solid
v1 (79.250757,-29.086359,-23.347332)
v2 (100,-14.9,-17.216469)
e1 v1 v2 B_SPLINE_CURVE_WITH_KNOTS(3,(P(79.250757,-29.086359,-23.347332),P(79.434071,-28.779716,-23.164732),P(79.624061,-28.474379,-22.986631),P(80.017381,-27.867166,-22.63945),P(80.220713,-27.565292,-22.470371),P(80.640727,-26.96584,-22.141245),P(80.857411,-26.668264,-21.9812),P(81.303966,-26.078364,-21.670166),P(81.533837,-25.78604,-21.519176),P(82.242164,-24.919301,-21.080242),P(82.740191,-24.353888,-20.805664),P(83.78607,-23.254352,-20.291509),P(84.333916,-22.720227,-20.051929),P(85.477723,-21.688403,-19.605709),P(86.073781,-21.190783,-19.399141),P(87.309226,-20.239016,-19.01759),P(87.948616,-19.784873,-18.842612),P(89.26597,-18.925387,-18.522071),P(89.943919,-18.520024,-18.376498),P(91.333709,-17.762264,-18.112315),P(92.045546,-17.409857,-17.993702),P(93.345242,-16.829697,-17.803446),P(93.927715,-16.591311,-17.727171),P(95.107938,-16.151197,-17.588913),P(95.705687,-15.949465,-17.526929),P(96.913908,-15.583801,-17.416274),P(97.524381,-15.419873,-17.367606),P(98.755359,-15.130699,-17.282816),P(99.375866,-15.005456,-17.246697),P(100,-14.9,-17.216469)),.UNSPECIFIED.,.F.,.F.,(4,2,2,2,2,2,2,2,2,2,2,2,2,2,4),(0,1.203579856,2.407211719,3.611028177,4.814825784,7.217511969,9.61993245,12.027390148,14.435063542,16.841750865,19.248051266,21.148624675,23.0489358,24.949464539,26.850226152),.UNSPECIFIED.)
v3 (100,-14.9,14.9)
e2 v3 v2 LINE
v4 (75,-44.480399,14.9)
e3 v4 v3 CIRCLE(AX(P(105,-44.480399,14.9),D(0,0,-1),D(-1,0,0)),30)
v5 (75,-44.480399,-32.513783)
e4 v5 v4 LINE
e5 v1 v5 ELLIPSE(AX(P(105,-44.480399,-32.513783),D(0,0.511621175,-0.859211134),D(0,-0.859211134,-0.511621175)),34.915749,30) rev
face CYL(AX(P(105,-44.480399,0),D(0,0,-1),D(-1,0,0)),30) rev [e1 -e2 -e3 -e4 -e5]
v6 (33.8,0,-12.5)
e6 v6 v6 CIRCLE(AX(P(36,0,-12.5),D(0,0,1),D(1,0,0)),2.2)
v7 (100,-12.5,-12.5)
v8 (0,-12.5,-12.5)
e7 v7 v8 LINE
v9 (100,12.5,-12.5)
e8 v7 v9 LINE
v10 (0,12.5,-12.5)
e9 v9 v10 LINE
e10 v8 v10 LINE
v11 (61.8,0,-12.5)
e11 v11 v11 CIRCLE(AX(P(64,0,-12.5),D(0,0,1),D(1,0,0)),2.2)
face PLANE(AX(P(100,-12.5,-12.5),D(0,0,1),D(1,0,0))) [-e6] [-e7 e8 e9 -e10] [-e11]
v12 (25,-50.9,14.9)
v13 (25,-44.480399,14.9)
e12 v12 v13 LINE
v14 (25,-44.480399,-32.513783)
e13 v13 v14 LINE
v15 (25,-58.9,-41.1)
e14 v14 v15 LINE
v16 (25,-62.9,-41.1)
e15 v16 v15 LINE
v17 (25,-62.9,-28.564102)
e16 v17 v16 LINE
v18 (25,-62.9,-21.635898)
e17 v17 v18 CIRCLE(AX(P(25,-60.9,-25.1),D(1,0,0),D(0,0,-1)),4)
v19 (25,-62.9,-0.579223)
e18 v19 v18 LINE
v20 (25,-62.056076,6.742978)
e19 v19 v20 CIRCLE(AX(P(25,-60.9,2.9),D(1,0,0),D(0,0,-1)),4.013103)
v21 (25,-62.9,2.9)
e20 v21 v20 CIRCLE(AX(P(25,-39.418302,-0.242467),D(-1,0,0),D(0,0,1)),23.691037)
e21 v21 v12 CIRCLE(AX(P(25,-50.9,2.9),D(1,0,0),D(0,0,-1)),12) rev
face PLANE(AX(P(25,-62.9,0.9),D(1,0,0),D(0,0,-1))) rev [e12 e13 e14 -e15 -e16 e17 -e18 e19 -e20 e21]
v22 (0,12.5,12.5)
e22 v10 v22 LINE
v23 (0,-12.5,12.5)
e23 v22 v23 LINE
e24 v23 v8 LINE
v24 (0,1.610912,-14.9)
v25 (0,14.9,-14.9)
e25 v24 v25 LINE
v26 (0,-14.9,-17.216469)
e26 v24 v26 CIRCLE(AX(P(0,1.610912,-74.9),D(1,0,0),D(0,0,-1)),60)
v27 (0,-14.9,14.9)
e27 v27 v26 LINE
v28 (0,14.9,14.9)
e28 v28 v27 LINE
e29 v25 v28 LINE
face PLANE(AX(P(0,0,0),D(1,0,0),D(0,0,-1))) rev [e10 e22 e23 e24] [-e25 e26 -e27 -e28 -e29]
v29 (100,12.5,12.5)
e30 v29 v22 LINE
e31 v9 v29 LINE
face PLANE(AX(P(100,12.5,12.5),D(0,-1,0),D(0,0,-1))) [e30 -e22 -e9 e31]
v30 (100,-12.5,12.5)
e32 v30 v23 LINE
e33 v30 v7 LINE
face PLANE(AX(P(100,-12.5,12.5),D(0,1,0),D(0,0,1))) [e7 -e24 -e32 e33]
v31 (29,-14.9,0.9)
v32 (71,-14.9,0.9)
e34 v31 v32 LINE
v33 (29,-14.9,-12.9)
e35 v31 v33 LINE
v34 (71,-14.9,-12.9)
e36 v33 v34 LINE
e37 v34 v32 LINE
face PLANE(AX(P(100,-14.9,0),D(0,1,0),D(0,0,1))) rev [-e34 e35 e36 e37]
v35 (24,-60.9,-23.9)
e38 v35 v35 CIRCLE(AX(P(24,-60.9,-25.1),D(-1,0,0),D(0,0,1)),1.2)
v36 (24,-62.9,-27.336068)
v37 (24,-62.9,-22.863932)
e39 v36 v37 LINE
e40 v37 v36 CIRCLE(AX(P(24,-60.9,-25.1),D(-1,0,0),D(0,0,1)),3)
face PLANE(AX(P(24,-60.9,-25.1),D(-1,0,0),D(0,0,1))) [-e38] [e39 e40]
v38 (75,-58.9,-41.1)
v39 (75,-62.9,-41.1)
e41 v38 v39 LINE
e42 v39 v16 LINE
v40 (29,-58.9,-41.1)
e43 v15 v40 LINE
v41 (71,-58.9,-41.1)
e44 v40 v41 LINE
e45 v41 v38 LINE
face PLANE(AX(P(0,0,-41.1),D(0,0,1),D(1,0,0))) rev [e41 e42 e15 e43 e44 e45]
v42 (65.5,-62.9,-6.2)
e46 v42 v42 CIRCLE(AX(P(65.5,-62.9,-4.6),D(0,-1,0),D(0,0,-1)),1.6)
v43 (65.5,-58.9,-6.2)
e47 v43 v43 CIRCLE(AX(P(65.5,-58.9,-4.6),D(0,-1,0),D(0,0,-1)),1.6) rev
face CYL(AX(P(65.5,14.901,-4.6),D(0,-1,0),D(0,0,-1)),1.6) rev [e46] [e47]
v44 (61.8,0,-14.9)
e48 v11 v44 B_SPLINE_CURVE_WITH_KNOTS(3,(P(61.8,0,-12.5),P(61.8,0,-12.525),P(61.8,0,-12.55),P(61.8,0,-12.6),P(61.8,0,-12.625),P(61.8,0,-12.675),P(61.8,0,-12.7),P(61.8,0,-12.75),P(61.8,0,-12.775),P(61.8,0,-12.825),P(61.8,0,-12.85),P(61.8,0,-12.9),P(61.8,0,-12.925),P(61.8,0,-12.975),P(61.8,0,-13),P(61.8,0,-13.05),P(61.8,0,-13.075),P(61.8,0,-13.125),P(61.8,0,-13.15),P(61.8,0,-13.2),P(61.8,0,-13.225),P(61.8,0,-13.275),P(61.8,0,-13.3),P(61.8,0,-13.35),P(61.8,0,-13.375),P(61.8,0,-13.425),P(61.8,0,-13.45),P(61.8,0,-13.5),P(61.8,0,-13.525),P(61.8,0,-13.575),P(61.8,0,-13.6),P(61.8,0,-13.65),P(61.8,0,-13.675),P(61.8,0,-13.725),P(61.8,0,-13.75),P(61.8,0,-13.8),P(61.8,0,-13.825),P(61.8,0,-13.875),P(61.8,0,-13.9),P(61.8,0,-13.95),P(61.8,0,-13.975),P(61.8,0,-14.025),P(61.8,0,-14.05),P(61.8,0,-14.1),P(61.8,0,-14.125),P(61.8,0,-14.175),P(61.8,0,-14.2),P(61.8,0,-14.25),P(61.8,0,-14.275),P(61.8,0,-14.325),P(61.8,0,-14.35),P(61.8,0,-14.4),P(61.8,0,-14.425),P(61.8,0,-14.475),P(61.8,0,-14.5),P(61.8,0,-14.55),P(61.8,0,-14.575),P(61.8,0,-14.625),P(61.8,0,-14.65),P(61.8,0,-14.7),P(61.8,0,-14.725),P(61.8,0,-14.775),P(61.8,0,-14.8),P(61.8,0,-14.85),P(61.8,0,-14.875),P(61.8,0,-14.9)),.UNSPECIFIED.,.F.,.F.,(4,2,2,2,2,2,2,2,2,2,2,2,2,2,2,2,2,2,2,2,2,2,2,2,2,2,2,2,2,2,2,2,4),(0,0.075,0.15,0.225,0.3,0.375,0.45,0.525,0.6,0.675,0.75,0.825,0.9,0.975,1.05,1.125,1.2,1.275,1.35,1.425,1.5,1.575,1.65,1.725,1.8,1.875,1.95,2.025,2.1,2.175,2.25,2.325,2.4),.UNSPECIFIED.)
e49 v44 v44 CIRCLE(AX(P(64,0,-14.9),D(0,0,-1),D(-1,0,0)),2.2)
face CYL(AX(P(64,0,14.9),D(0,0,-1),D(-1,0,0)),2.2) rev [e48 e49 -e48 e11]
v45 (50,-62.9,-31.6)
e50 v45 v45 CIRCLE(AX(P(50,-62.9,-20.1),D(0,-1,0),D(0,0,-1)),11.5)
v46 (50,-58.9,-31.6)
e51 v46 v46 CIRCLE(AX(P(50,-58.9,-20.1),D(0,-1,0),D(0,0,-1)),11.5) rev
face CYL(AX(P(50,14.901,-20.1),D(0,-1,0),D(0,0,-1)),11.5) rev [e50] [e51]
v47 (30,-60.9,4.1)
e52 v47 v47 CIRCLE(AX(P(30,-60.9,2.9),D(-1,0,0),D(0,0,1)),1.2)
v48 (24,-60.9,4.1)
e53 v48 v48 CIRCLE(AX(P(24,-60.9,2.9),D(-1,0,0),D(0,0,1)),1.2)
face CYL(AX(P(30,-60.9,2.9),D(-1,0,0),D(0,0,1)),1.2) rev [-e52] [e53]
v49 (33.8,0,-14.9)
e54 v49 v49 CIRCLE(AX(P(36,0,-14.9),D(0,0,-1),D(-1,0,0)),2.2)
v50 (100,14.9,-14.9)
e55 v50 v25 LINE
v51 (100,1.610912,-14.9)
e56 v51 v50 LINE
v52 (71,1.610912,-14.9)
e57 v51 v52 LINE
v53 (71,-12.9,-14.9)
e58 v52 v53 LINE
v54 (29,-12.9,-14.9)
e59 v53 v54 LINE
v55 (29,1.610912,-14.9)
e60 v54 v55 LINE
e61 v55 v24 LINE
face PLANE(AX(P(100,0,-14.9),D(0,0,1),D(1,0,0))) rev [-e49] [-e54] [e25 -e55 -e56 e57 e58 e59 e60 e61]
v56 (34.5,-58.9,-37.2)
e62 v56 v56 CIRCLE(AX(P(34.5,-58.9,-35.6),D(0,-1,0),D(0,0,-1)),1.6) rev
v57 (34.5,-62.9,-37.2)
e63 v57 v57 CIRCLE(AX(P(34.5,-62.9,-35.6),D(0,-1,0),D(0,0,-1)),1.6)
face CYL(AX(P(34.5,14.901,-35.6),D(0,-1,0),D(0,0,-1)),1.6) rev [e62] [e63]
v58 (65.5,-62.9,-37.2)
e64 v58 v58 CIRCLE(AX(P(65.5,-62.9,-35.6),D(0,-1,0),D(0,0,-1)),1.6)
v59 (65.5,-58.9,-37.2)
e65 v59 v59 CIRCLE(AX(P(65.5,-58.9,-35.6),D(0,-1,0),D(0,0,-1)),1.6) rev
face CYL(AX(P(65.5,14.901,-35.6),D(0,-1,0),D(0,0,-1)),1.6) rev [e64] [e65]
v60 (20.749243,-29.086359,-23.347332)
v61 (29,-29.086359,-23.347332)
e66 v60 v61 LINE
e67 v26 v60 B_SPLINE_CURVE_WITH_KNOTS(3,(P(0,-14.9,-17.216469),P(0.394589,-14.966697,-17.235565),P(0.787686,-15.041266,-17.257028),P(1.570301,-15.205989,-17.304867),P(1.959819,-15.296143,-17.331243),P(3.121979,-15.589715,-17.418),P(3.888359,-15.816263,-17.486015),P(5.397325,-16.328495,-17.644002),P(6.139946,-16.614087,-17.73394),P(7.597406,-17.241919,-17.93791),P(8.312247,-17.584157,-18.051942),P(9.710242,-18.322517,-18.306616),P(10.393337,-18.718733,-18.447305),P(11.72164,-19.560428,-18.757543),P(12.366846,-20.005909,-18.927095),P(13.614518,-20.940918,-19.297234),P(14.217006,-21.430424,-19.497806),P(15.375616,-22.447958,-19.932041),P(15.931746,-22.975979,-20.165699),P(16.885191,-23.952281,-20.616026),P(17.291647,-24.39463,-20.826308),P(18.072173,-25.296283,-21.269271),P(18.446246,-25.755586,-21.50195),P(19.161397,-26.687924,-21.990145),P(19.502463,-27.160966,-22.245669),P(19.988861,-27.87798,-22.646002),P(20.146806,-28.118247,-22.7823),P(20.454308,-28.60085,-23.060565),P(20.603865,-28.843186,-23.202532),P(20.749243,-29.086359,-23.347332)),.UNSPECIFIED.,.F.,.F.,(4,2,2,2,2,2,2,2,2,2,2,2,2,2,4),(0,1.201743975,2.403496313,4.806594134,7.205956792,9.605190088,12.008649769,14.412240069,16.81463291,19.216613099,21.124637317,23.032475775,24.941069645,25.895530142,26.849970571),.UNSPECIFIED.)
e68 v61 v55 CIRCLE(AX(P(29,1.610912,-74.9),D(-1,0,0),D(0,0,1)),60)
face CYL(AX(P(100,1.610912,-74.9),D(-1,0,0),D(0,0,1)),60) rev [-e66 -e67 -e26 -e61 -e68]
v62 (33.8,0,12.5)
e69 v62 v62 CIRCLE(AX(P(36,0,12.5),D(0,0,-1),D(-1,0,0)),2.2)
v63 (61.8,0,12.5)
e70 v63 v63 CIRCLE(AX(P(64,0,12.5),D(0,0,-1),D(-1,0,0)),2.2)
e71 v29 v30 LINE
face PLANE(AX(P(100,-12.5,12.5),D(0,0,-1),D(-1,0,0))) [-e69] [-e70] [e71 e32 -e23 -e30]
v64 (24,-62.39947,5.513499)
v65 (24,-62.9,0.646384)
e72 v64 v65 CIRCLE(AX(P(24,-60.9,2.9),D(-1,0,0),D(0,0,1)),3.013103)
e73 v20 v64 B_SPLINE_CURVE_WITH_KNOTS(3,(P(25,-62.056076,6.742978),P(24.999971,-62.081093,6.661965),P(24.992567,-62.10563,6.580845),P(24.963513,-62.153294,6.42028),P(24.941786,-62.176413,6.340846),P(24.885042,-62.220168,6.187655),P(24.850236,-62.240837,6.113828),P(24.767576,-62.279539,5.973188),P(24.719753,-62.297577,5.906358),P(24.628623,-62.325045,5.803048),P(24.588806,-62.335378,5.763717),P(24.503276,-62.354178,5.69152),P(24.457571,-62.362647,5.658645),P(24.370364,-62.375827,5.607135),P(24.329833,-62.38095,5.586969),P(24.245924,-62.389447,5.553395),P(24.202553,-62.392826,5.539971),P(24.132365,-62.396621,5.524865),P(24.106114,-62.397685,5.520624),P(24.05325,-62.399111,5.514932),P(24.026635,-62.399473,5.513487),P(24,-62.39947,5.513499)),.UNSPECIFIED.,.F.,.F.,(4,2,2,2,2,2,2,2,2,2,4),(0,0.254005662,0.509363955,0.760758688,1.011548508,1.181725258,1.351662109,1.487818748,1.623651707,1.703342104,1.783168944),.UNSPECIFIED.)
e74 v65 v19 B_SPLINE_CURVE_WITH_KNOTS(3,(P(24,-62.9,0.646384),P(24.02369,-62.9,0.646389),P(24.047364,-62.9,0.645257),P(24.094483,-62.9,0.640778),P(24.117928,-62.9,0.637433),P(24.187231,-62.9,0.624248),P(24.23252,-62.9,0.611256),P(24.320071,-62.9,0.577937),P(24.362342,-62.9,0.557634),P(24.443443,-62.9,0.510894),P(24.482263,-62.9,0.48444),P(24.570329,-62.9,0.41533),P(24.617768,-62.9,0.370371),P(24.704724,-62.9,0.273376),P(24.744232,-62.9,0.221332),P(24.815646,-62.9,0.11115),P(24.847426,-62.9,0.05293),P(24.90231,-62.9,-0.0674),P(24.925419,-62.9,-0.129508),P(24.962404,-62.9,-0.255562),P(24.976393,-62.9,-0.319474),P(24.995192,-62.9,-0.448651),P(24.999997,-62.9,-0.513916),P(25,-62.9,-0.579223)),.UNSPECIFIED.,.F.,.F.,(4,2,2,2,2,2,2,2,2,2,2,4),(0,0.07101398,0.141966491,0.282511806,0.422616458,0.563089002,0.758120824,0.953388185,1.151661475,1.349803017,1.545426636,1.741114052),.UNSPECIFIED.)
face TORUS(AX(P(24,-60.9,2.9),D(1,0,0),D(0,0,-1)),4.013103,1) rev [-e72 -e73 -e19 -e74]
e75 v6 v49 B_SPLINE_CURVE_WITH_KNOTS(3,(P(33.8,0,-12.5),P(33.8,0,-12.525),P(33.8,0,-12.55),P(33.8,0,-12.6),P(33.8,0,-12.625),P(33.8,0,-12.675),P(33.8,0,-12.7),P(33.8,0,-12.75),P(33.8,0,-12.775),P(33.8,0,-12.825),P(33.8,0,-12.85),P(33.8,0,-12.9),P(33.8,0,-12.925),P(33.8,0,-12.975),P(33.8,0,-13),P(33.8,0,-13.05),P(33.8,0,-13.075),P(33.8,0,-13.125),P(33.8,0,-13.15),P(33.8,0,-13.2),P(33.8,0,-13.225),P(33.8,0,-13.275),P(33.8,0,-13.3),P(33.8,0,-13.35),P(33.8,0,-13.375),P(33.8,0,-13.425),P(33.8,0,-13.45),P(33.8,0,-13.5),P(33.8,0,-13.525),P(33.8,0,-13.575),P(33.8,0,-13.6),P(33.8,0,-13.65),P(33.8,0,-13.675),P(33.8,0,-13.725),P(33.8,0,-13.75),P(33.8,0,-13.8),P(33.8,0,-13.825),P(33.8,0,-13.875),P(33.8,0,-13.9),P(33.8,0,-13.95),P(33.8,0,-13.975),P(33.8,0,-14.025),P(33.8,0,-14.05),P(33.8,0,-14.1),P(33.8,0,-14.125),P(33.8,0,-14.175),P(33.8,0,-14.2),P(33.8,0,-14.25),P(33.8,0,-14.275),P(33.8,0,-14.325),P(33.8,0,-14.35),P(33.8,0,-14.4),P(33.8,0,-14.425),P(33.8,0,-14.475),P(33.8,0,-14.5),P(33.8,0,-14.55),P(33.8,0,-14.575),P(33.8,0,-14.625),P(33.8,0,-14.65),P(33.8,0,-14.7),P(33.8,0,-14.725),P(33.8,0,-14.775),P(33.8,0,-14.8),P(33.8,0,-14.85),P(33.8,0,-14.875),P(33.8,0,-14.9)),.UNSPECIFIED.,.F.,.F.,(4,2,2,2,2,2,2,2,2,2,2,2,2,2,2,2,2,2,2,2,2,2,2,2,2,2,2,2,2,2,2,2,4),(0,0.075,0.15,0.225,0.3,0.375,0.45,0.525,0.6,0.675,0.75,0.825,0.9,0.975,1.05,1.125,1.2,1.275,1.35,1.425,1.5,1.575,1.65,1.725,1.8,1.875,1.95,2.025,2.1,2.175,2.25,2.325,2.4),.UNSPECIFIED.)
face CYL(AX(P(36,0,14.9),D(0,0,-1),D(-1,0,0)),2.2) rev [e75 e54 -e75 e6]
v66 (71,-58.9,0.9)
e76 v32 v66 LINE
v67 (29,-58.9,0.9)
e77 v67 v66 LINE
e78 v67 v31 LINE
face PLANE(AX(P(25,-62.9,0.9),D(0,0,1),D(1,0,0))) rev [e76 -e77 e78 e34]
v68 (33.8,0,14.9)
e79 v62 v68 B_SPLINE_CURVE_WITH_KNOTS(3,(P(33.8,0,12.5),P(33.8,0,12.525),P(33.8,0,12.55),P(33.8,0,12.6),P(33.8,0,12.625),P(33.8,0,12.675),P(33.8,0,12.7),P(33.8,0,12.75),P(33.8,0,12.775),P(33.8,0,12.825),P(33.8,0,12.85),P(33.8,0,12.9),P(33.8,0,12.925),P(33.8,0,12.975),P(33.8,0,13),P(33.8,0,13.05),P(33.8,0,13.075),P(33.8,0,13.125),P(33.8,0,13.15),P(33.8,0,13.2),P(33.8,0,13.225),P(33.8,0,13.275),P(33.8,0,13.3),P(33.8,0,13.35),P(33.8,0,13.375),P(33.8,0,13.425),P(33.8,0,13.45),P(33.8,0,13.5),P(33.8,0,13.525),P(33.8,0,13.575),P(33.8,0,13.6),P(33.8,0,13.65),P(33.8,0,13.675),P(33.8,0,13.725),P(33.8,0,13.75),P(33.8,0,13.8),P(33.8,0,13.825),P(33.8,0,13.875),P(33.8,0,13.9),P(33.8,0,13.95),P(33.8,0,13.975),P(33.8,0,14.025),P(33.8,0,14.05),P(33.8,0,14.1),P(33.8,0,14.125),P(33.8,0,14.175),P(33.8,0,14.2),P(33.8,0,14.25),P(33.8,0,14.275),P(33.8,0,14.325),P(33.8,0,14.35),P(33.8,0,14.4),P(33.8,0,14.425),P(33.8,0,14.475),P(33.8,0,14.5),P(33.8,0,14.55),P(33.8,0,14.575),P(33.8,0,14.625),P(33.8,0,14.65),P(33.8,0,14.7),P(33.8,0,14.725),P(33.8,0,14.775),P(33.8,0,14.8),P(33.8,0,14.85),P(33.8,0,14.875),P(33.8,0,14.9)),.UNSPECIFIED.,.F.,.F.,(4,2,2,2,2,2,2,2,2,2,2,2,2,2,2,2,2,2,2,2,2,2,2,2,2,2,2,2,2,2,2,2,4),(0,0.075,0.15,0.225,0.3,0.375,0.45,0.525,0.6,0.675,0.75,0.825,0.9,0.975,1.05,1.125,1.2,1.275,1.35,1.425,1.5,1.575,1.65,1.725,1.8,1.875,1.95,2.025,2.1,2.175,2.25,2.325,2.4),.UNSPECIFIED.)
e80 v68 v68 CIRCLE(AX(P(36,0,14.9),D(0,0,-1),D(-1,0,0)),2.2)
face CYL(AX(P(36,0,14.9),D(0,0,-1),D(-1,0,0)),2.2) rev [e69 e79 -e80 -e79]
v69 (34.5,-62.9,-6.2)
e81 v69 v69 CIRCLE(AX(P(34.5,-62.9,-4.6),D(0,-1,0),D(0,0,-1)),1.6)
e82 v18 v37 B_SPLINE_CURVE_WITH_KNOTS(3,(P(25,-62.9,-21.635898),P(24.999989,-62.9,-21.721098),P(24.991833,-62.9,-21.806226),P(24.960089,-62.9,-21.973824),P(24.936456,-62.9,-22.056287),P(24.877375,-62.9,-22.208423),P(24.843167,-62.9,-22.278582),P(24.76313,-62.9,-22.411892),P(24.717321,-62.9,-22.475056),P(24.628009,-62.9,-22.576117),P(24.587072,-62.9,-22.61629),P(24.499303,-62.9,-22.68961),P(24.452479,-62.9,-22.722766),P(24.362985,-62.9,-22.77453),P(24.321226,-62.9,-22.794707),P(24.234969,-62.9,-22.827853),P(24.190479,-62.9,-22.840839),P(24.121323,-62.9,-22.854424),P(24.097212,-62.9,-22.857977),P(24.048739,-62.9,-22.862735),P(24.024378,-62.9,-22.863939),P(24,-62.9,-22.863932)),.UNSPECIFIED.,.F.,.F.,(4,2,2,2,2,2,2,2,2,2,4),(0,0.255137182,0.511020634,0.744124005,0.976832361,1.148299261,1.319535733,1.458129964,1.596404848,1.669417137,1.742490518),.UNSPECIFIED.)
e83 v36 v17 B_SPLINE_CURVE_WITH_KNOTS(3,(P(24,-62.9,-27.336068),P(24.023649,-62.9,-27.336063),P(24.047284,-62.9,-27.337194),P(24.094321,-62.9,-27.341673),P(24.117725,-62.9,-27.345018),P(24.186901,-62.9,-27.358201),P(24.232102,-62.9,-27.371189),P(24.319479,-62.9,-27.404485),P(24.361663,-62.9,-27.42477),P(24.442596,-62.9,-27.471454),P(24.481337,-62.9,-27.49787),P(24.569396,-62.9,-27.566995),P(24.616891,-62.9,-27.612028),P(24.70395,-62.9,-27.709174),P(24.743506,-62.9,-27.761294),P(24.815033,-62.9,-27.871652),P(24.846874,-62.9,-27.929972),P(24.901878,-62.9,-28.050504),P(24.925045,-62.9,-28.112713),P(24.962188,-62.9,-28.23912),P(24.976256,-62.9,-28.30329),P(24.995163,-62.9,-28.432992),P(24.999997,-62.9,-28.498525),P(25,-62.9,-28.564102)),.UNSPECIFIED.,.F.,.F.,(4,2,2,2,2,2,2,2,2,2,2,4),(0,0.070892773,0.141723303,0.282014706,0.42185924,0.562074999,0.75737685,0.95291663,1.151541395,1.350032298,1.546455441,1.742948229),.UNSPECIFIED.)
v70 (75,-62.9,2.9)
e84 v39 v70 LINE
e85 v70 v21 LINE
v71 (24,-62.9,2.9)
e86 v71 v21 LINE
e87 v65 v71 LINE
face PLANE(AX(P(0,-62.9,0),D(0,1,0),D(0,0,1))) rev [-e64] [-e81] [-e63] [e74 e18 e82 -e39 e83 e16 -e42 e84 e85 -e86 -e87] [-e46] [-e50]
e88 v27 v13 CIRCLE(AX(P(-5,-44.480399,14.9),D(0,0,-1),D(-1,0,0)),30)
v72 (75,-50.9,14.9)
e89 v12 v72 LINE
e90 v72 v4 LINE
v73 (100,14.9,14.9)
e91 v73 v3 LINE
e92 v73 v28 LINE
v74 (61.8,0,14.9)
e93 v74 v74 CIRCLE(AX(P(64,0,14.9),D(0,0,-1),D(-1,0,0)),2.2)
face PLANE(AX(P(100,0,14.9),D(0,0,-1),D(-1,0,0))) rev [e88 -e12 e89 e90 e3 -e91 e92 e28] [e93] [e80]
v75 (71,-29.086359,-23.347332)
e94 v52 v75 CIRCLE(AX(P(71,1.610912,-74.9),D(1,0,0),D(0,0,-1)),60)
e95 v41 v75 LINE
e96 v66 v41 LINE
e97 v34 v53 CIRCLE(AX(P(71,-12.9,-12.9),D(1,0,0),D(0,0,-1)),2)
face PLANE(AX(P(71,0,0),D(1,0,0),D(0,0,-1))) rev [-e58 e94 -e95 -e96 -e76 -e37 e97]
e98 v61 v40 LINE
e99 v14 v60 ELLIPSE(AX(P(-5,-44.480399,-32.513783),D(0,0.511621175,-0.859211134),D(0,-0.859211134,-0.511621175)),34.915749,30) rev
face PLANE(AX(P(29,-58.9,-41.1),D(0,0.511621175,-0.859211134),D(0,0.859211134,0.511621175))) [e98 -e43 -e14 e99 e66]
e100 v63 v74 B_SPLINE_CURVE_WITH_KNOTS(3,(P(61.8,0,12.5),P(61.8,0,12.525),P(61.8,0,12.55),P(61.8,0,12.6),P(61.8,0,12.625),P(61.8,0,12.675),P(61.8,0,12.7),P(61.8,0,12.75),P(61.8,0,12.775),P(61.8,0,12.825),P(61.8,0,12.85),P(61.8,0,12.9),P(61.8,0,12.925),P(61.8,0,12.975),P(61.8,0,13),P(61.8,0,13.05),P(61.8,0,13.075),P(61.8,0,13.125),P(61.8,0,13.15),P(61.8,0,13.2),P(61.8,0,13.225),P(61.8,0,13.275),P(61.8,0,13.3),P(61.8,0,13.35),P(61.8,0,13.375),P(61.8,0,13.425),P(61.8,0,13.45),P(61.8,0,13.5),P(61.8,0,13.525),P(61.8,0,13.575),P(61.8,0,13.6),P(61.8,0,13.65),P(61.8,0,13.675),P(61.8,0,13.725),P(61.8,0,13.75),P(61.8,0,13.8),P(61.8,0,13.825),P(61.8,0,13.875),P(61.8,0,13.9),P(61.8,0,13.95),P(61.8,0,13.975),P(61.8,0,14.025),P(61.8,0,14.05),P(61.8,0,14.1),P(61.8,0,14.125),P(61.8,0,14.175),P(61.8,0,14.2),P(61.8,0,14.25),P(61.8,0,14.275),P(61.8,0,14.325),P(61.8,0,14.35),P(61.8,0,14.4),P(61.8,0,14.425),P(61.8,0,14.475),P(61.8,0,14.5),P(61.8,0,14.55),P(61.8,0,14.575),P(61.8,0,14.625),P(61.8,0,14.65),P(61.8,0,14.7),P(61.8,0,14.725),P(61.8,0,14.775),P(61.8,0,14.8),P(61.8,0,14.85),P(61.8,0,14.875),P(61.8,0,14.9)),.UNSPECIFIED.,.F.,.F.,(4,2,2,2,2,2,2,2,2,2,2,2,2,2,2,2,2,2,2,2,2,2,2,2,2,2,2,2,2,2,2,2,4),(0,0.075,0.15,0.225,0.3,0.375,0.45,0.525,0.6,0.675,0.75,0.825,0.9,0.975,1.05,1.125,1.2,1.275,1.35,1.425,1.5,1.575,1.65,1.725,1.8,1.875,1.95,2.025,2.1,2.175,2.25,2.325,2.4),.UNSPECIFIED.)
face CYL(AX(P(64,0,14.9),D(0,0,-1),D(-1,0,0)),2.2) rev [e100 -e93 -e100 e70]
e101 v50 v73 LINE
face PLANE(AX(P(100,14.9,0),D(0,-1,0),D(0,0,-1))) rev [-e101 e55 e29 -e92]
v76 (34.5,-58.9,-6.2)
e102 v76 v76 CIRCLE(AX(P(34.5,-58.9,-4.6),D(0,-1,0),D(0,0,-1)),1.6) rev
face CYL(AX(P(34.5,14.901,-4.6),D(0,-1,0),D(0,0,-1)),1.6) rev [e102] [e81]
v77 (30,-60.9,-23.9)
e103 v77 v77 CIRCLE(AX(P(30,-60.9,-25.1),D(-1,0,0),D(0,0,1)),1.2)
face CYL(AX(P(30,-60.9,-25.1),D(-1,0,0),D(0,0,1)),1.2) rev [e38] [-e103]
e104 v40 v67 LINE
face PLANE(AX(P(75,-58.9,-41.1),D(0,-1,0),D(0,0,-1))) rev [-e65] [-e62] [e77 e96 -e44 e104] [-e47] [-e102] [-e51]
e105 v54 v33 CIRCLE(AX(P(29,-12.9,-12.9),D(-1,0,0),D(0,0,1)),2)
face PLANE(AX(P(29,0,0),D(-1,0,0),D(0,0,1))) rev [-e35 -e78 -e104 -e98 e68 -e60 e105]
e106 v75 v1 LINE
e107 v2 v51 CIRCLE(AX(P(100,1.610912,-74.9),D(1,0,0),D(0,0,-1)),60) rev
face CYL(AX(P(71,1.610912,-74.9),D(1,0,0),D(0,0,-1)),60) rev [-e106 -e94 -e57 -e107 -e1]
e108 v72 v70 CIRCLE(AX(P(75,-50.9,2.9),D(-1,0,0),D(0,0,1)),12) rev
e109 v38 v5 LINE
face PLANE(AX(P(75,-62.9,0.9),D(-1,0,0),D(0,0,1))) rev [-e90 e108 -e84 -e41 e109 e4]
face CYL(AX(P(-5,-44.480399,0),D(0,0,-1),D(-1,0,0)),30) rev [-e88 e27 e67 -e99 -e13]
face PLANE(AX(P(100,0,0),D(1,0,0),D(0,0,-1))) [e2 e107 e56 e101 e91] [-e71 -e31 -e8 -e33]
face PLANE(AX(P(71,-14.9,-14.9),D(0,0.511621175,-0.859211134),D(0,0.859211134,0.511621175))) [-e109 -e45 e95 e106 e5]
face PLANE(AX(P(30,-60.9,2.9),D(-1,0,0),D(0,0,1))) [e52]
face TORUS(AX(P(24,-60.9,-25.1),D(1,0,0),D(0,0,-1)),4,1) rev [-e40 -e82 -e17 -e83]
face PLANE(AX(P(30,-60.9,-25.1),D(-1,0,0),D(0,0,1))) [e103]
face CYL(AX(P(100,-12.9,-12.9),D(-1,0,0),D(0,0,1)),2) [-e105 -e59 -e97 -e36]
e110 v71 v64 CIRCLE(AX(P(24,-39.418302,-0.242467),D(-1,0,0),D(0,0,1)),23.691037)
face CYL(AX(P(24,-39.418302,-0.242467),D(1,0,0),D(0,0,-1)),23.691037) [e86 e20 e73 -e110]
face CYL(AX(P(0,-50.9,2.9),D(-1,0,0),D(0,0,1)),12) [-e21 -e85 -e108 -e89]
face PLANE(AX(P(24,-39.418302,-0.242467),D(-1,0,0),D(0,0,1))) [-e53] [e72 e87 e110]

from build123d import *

# Parameters (mm, degrees)
SKETCH_1_W          = 25
SKETCH_1_H          = 25
EXTRUDE_1_DEPTH     = 100
EXTRUDE_1_2_DEPTH   = 48
SKETCH_3_W          = 50.00000000000001
SKETCH_3_H          = 4
EXTRUDE_2_DEPTH     = 42
EXTRUDE_3_DEPTH     = 4
EXTRUDE_4_DEPTH     = 4
FILLET_2_R          = 30
CUT_EXTRUDE_1_REACH = 135.199
SKETCH_6_R          = 11.500000000000005
SKETCH_6_R_2        = 1.6000000000000052
SKETCH_6_R_3        = 1.5999999999999974
SKETCH_6_R_4        = 1.600000000000006
FILLET_3_R          = 12
FILLET_4_R          = 60
SKETCH_7_R          = 2.1999999999999984
CUT_EXTRUDE_2_DEPTH = 122.8378021221657
FILLET_5_R          = 2
SKETCH_8_R          = 1.2000000000000004
SKETCH_8_R_2        = 1.1999999999999995
CUT_EXTRUDE_3_DEPTH = 5
EXTRUDE_START       = 1
SKETCH_9_R          = 1.2000000000000004
SKETCH_9_R_2        = 1.1999999999999986
EXTRUDE_5_DEPTH     = 1
FILLET_6_R          = 1


# Some blends are built 0.0001 mm under size
with BuildPart() as part:
    # Эскиз1 → Extrude 1 (new body)
    with BuildSketch(Plane(origin=(0, 0, 0), x_dir=(0, 0, -1), z_dir=(1, 0, 0))):
        Polygon((14.899999999999997, 14.899999999999999), (-14.900000000000006, 14.899999999999999), (-14.900000000000004, -14.899999999999999), (14.899999999999993, -14.900000000000002), align=None)
        Rectangle(SKETCH_1_W, SKETCH_1_H, mode=Mode.SUBTRACT)
    extrude(amount=EXTRUDE_1_DEPTH)

    # Эскиз2 → Extrude 1 2 (add)
    with BuildSketch(Plane.XZ.offset(14.900000000000002)):
        Polygon((25.000000000000007, 0.9000000000000085), (75.00000000000001, 0.9000000000000085), (75.00000000000001, 14.900000000000016), (25.000000000000007, 14.90000000000001), align=None)
    extrude(amount=EXTRUDE_1_2_DEPTH)

    # Эскиз3 → Бобышка-Вытянуть2 (add)
    with BuildSketch(Plane(origin=(0, 0, 0.9000000000000085), x_dir=(-1, 0, 0), z_dir=(0, 0, -1))):
        with Locations((-50.000000000000014, -60.89999999999999)):
            Rectangle(SKETCH_3_W, SKETCH_3_H)
    extrude(amount=EXTRUDE_2_DEPTH)

    # Эскиз4 → Бобышка-Вытянуть3 (add)
    with BuildSketch(Plane(origin=(75.00000000000001, 0, 0), x_dir=(0, 0, -1), z_dir=(1, 0, 0))):
        Polygon((14.899999999999997, -14.900000000000002), (41.099999999999994, -58.89999999999999), (-0.9000000000000085, -58.89999999999999), (-0.9000000000000032, -14.900000000000002), align=None)
    extrude(amount=-EXTRUDE_3_DEPTH)

    # Эскиз5 → Бобышка-Вытянуть4 (add)
    with BuildSketch(Plane.ZY.offset(-25.000000000000007)):
        Polygon((-41.099999999999994, -58.89999999999999), (-14.899999999999997, -14.900000000000002), (0.9000000000000032, -14.900000000000002), (0.9000000000000085, -58.89999999999999), align=None)
    extrude(amount=-EXTRUDE_4_DEPTH)

    # Скругление2
    # the kernel refuses this fillet: 30 mm, written as the material it adds along each edge
    with BuildSketch(Plane(origin=(75.00000000000001, -14.900000000000002, 14.900000000000016), x_dir=(1, -1.1724e-13, 0), z_dir=(0, 0, -1))) as fillet_2_piece_1_section:
        with BuildLine():
            CenterArc((30.000000000003467, 29.58039891549758), FILLET_2_R, 179.9999999999933, 80.40593177314048)
            Line((3.46799e-12, 29.580398915501096), (-0.5999999999965263, 29.580398915501167))
            Line((-0.5999999999965263, 29.580398915501167), (-0.5999999999999943, 7.034e-14))
            Line((-0.5999999999999943, 7.034e-14), (-7.034e-14, -0.5999999999999996))
            ThreePointArc((-7.034e-14, -0.5999999999999996), (12.50000000000017, -0.6000000000014687), (24.900000000000418, -0.5916079783099508))
            Line((24.900000000000418, -0.5916079783099508), (25.000000000000483, 0))
        make_face()
    fillet_2_piece_1 = extrude(amount=29.80000000000001, mode=Mode.PRIVATE)
    fillet_2_piece_1 = split(fillet_2_piece_1, bisect_by=Plane(origin=(81.1670170800043, -13.413841962792697, -14.0150604414811), z_dir=(0, -0.5116211753096359, 0.8592111341077854)), keep=Keep.TOP, mode=Mode.PRIVATE)
    add(fillet_2_piece_1)
    with BuildSketch(Plane(origin=(75.00000000000001, -14.900000000000002, 14.900000000000016), x_dir=(1, -1.1724e-13, 0), z_dir=(0, 0, -1))) as fillet_2_piece_2_section:
        with BuildLine():
            CenterArc((30.000000000003467, 29.58039891549758), FILLET_2_R, 179.9999999999933, 80.40593177314048)
            Line((3.46799e-12, 29.580398915501096), (-0.5999999999965263, 29.580398915501167))
            Line((-0.5999999999965263, 29.580398915501167), (-0.5999999999999943, 7.034e-14))
            Line((-0.5999999999999943, 7.034e-14), (-7.034e-14, -0.5999999999999996))
            ThreePointArc((-7.034e-14, -0.5999999999999996), (12.50000000000017, -0.6000000000014687), (24.900000000000418, -0.5916079783099508))
            Line((24.900000000000418, -0.5916079783099508), (25.000000000000483, 0))
        make_face()
    fillet_2_piece_2 = extrude(amount=103.75099728875276, mode=Mode.PRIVATE)
    fillet_2_piece_2 = split(fillet_2_piece_2, bisect_by=Plane(origin=(78.03670654551321, -27.69206450172471, -14.899999999999991), z_dir=(0, -1.2e-16, -1)), keep=Keep.TOP, mode=Mode.PRIVATE)
    fillet_2_piece_2 = split(fillet_2_piece_2, bisect_by=Plane(origin=(78.03670654551321, -26.01786323182673, -21.520182197133188), z_dir=(0, -0.5116211753096359, 0.8592111341077854)), keep=Keep.TOP, mode=Mode.PRIVATE)
    add(fillet_2_piece_2)
    with BuildSketch(Plane(origin=(75.00000000000001, -14.900000000000002, 14.900000000000016), x_dir=(1, -1.1724e-13, 0), z_dir=(0, 0, -1))) as fillet_2_piece_3_section:
        with BuildLine():
            CenterArc((30.000000000003467, 29.58039891549758), FILLET_2_R, 179.9999999999933, 80.40593177314048)
            Line((3.46799e-12, 29.580398915501096), (-0.5999999999965263, 29.580398915501167))
            Line((-0.5999999999965263, 29.580398915501167), (-0.5999999999999943, 7.034e-14))
            Line((-0.5999999999999943, 7.034e-14), (-7.034e-14, -0.5999999999999996))
            ThreePointArc((-7.034e-14, -0.5999999999999996), (12.50000000000017, -0.6000000000014687), (24.900000000000418, -0.5916079783099508))
            Line((24.900000000000418, -0.5916079783099508), (25.000000000000483, 0))
        make_face()
    fillet_2_piece_3 = extrude(amount=29.80000000000001, mode=Mode.PRIVATE)
    fillet_2_piece_3 = split(fillet_2_piece_3, bisect_by=Plane(origin=(87.30790234875249, -14.553945511924846, -14.6939402821007), z_dir=(0, 0.5116211753096359, -0.8592111341077854)), keep=Keep.TOP, mode=Mode.PRIVATE)
    add(fillet_2_piece_3)
    with BuildSketch(Plane(origin=(25.000000000000007, -14.900000000000011, -88.85099728875262), x_dir=(0, -1, 0), z_dir=(0, 0, 1))) as fillet_2_piece_4_section:
        with BuildLine():
            CenterArc((29.5803989155011, -30), FILLET_2_R, 90, 80.40593177314054)
            Line((2.93632e-12, -25.000000000000504), (-0.5916079783070263, -24.900000000000514))
            ThreePointArc((-0.5916079783070263, -24.900000000000514), (-0.5999999999999996, -12.500000000000252), (-0.5999999999999996, 0))
            Line((-0.5999999999999996, 0), (0, 0.6000000000000014))
            Line((0, 0.6000000000000014), (29.5803989155011, 0.6000000000000014))
            Line((29.5803989155011, 0.6000000000000014), (29.5803989155011, 0))
        make_face()
    fillet_2_piece_4 = extrude(amount=103.75099728875263, mode=Mode.PRIVATE)
    fillet_2_piece_4 = split(fillet_2_piece_4, bisect_by=Plane(origin=(21.96329345452578, -26.01786323182675, -21.5201821971332), z_dir=(0, -0.5116211753096359, 0.8592111341077854)), keep=Keep.TOP, mode=Mode.PRIVATE)
    fillet_2_piece_4 = split(fillet_2_piece_4, bisect_by=Plane(origin=(21.96329345452578, -27.69206450173281, -14.899999999999991), z_dir=(0, -1.2e-16, -1)), keep=Keep.TOP, mode=Mode.PRIVATE)
    add(fillet_2_piece_4)
    with BuildSketch(Plane(origin=(25.000000000000007, -14.900000000000002, -14.899999999999997), x_dir=(0, -1, 0), z_dir=(0, 0, 1))) as fillet_2_piece_5_section:
        with BuildLine():
            CenterArc((29.58039891550111, -30), FILLET_2_R, 90, 80.40593177314054)
            Line((2.9452e-12, -25.000000000000504), (-0.5916079783070174, -24.900000000000514))
            ThreePointArc((-0.5916079783070174, -24.900000000000514), (-0.5999999999999996, -12.500000000000252), (-0.5999999999999996, 0))
            Line((-0.5999999999999996, 0), (0, 0.6000000000000014))
            Line((0, 0.6000000000000014), (29.58039891550111, 0.6000000000000014))
            Line((29.58039891550111, 0.6000000000000014), (29.58039891550111, 0))
        make_face()
    fillet_2_piece_5 = extrude(amount=29.800000000000004, mode=Mode.PRIVATE)
    fillet_2_piece_5 = split(fillet_2_piece_5, bisect_by=Plane(origin=(12.6920976512564, -14.55394551192456, -14.693940282100531), z_dir=(0, 0.5116211753096359, -0.8592111341077854)), keep=Keep.TOP, mode=Mode.PRIVATE)
    add(fillet_2_piece_5)
    with BuildSketch(Plane(origin=(25.000000000000007, -14.900000000000002, -14.899999999999997), x_dir=(0, -1, 0), z_dir=(0, 0, 1))) as fillet_2_piece_6_section:
        with BuildLine():
            CenterArc((29.58039891550111, -30), FILLET_2_R, 90, 80.40593177314054)
            Line((2.9452e-12, -25.000000000000504), (-0.5916079783070174, -24.900000000000514))
            ThreePointArc((-0.5916079783070174, -24.900000000000514), (-0.5999999999999996, -12.500000000000252), (-0.5999999999999996, 0))
            Line((-0.5999999999999996, 0), (0, 0.6000000000000014))
            Line((0, 0.6000000000000014), (29.58039891550111, 0.6000000000000014))
            Line((29.58039891550111, 0.6000000000000014), (29.58039891550111, 0))
        make_face()
    fillet_2_piece_6 = extrude(amount=29.800000000000004, mode=Mode.PRIVATE)
    fillet_2_piece_6 = split(fillet_2_piece_6, bisect_by=Plane(origin=(18.83298291999507, -13.413841962792766, -14.015060441481143), z_dir=(0, -0.5116211753096359, 0.8592111341077854)), keep=Keep.TOP, mode=Mode.PRIVATE)
    add(fillet_2_piece_6)

    # Эскиз6 → Вырез-Вытянуть1 (cut, up to next)
    with BuildSketch(Plane.XZ.offset(62.9), mode=Mode.PRIVATE) as cut_extrude_1_sk1:
        with Locations(Location((50.00000000000001, -20.099999999999998, 0), (0, 0, 270))):
            Circle(SKETCH_6_R)
    cut_extrude_1_tool1 = extrude(cut_extrude_1_sk1.sketch, amount=-CUT_EXTRUDE_1_REACH, mode=Mode.PRIVATE) & part.part
    # Эскиз6 → Вырез-Вытянуть1 (cut, up to next)
    with BuildSketch(Plane.XZ.offset(62.9), mode=Mode.PRIVATE) as cut_extrude_1_sk2:
        with Locations(Location((34.50000000000001, -4.599999999999993, 0), (0, 0, 270))):
            Circle(SKETCH_6_R_2)
    cut_extrude_1_tool2 = extrude(cut_extrude_1_sk2.sketch, amount=-CUT_EXTRUDE_1_REACH, mode=Mode.PRIVATE) & part.part
    # Эскиз6 → Вырез-Вытянуть1 (cut, up to next)
    with BuildSketch(Plane.XZ.offset(62.9), mode=Mode.PRIVATE) as cut_extrude_1_sk3:
        with Locations(Location((65.5, -4.599999999999993, 0), (0, 0, 270))):
            Circle(SKETCH_6_R_2)
    cut_extrude_1_tool3 = extrude(cut_extrude_1_sk3.sketch, amount=-CUT_EXTRUDE_1_REACH, mode=Mode.PRIVATE) & part.part
    # Эскиз6 → Вырез-Вытянуть1 (cut, up to next)
    with BuildSketch(Plane.XZ.offset(62.9), mode=Mode.PRIVATE) as cut_extrude_1_sk4:
        with Locations(Location((34.50000000000001, -35.599999999999994, 0), (0, 0, 270))):
            Circle(SKETCH_6_R_3)
    cut_extrude_1_tool4 = extrude(cut_extrude_1_sk4.sketch, amount=-CUT_EXTRUDE_1_REACH, mode=Mode.PRIVATE) & part.part
    # Эскиз6 → Вырез-Вытянуть1 (cut, up to next)
    with BuildSketch(Plane.XZ.offset(62.9), mode=Mode.PRIVATE) as cut_extrude_1_sk5:
        with Locations(Location((65.5, -35.599999999999994, 0), (0, 0, 270))):
            Circle(SKETCH_6_R_4)
    cut_extrude_1_tool5 = extrude(cut_extrude_1_sk5.sketch, amount=-CUT_EXTRUDE_1_REACH, mode=Mode.PRIVATE) & part.part
    add(cut_extrude_1_tool1.solids().sort_by_distance((50, -62.9, -20.1))[0], mode=Mode.SUBTRACT)
    add(cut_extrude_1_tool2.solids().sort_by_distance((34.5, -62.9, -4.6))[0], mode=Mode.SUBTRACT)
    add(cut_extrude_1_tool3.solids().sort_by_distance((65.5, -62.9, -4.6))[0], mode=Mode.SUBTRACT)
    add(cut_extrude_1_tool4.solids().sort_by_distance((34.5, -62.9, -35.6))[0], mode=Mode.SUBTRACT)
    add(cut_extrude_1_tool5.solids().sort_by_distance((65.5, -62.9, -35.6))[0], mode=Mode.SUBTRACT)

    # Скругление3
    fillet_3_edges = [part.edges().sort_by_distance(p)[0] for p in [
        (50.000000000000014, -62.900000000000006, 14.900000000000013),
    ]]
    fillet(fillet_3_edges, radius=FILLET_3_R)

    # Скругление4
    fillet_4_edges = [part.edges().sort_by_distance(p)[0] for p in [
        (14.499999999999712, -14.900000000000967, -14.899999999999435),
        (85.49999999999991, -14.900000000000125, -14.899999999999999),
    ]]
    fillet(fillet_4_edges, radius=FILLET_4_R)

    # Эскиз7 → Вырез-Вытянуть2 (cut, through all)
    with BuildSketch(Plane(origin=(0, 0, -14.899999999999997), x_dir=(-1, 0, 0), z_dir=(0, 0, -1))):
        with Locations((-64, -7.84e-15)):
            Circle(SKETCH_7_R)
        with Locations((-36, -4.41e-15)):
            Circle(SKETCH_7_R)
    extrude(amount=-CUT_EXTRUDE_2_DEPTH, mode=Mode.SUBTRACT)

    # Скругление5
    fillet_5_edges = [part.edges().sort_by_distance(p)[0] for p in [
        (50.000000000000014, -14.900000000000002, -14.899999999999993),
    ]]
    fillet(fillet_5_edges, radius=FILLET_5_R)

    # Эскиз8 → Вырез-Вытянуть3 (cut)
    with BuildSketch(Plane.ZY.offset(-25.000000000000007)):
        with Locations((-25.099999999999998, -60.9)):
            Circle(SKETCH_8_R)
        with Locations((2.9000000000000035, -60.9)):
            Circle(SKETCH_8_R_2)
    extrude(amount=-CUT_EXTRUDE_3_DEPTH, mode=Mode.SUBTRACT)

    # Эскиз9 → Бобышка-Вытянуть5 (add)
    # profile 1 of 2: a face of its own
    with BuildSketch(Plane.ZY.offset(-25.000000000000007).offset(EXTRUDE_START)):
        with BuildLine():
            Line((-27.336067977499788, -62.9), (-22.863932022500208, -62.9))
            ThreePointArc((-22.863932022500208, -62.9), (-25.099999999999998, -57.9), (-27.336067977499788, -62.9))
        make_face()
        with Locations((-25.099999999999998, -60.9)):
            Circle(SKETCH_9_R, mode=Mode.SUBTRACT)
    # profile 2 of 2: a face of its own
    with BuildSketch(Plane.ZY.offset(-25.000000000000007).offset(EXTRUDE_START)):
        with BuildLine():
            Line((2.9000000000000035, -62.9), (0.6463835715880533, -62.9))
            ThreePointArc((0.6463835715880533, -62.9), (2.5917609374486457, -57.90270527196178), (5.513498770016945, -62.39947030164927))
            ThreePointArc((5.513498770016945, -62.39947030164927), (4.213782424449112, -62.686457926692185), (2.9000000000000035, -62.9))
        make_face()
        with Locations((2.9000000000000035, -60.9)):
            Circle(SKETCH_9_R_2, mode=Mode.SUBTRACT)
    extrude(amount=-EXTRUDE_5_DEPTH)

    # Скругление6
    fillet_6_edges = [part.edges().sort_by_distance(p)[0] for p in [
        (25.000000000000007, -57.90270527196177, 2.59176093744865),
        (25.000000000000007, -57.9, -25.099999999999998),
    ]]
    fillet(fillet_6_edges, radius=FILLET_6_R - 0.0001)  # a hair under: the kernel refuses the full size


solid = part.part
